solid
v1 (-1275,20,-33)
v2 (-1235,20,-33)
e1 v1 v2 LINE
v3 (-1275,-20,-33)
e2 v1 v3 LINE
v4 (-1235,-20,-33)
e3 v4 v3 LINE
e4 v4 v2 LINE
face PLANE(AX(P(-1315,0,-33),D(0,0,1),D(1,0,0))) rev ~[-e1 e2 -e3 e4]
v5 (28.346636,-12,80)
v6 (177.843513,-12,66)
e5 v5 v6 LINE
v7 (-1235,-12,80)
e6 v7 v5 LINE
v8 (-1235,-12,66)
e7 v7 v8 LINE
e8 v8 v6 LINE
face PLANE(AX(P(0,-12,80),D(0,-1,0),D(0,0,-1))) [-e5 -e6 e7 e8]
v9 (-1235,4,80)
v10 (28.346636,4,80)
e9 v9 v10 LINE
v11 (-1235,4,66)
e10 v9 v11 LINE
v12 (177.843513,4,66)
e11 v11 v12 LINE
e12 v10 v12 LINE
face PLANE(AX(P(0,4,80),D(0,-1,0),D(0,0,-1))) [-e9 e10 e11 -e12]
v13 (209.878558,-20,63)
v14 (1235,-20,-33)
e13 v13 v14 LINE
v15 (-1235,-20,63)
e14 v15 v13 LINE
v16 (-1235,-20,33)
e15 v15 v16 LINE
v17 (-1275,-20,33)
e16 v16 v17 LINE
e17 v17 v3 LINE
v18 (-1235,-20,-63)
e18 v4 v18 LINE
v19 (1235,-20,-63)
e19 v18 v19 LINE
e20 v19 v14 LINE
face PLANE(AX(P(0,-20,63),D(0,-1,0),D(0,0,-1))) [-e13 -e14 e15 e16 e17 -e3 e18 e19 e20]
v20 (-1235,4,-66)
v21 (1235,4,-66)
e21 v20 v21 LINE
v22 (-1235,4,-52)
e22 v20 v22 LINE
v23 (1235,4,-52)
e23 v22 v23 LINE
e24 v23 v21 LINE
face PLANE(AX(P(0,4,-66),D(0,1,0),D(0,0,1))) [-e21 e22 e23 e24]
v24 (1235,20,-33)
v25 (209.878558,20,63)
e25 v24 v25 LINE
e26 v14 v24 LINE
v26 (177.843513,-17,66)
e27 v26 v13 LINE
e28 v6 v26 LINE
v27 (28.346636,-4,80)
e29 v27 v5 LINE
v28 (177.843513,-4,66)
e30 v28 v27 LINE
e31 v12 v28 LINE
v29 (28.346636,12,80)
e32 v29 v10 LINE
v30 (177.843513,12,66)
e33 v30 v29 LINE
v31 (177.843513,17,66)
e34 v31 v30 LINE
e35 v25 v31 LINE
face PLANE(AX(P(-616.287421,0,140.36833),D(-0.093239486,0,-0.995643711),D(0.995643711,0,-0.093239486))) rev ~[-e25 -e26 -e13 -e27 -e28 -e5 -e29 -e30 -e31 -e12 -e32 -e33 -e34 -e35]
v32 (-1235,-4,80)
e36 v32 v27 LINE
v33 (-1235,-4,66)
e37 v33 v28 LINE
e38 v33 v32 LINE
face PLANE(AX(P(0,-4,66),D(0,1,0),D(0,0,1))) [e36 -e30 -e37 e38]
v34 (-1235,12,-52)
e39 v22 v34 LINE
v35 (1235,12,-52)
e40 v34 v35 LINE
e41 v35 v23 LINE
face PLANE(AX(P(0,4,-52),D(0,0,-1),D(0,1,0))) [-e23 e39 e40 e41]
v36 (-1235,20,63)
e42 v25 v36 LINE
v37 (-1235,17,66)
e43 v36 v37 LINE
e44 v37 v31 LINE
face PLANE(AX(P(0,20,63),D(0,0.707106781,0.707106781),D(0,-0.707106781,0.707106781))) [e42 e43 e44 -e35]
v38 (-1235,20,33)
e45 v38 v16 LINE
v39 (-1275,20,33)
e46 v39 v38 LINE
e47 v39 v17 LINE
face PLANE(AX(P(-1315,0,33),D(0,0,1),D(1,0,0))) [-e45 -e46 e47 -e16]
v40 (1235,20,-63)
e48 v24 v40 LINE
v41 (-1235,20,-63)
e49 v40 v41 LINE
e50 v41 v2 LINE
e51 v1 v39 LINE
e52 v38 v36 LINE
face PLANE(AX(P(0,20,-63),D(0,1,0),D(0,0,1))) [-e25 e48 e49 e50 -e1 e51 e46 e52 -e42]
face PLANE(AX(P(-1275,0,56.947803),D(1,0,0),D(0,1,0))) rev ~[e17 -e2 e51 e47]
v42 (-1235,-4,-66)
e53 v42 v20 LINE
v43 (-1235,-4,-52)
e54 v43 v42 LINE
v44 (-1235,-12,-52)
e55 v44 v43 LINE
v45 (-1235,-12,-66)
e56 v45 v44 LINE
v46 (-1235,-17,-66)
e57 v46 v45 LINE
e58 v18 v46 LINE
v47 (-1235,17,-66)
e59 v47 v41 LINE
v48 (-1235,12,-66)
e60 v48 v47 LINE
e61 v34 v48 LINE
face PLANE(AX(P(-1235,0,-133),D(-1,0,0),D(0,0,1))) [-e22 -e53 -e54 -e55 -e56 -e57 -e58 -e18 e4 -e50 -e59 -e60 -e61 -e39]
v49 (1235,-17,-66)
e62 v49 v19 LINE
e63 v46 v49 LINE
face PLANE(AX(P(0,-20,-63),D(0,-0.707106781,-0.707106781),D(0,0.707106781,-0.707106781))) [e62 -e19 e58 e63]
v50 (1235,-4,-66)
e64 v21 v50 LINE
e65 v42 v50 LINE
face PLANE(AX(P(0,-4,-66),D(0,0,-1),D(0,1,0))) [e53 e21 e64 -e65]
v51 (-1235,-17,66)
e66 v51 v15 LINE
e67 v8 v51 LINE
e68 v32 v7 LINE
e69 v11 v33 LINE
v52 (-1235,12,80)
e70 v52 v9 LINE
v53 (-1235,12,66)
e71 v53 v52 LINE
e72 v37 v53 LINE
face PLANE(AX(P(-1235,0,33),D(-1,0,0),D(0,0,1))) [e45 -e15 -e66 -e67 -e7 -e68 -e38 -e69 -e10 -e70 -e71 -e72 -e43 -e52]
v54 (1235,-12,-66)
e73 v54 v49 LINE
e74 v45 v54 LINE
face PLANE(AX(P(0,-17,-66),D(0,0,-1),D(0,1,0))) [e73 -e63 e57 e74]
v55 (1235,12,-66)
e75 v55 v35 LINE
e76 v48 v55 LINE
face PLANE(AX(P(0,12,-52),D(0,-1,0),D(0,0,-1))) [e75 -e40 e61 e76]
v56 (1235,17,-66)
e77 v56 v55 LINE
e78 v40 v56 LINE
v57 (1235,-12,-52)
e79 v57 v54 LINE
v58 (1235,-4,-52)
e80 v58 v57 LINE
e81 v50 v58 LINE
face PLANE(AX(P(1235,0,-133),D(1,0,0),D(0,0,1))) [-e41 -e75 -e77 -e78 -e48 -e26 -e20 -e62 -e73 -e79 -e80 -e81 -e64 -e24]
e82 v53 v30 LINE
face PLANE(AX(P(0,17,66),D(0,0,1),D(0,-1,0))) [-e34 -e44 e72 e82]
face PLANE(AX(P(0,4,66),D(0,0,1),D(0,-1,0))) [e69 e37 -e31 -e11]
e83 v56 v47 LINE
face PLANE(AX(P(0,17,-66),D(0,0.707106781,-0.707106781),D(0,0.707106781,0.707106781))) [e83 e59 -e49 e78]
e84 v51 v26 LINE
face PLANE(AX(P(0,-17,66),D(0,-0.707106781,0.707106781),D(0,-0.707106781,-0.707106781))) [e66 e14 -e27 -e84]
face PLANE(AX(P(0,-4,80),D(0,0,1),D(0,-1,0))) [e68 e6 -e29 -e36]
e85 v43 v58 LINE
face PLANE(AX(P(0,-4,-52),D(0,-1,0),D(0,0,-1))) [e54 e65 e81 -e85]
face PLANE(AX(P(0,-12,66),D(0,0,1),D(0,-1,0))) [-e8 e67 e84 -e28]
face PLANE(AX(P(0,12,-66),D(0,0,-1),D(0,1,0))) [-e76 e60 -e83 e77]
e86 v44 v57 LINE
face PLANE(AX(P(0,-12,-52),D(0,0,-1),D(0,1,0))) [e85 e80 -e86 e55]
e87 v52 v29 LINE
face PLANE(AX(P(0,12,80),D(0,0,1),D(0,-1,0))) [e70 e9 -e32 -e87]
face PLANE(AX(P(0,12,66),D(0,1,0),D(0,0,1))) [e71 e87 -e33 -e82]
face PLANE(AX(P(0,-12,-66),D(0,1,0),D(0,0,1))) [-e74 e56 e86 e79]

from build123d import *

# Parameters (mm, degrees)
F1_W     = 40
F1_H     = 33
F3_DEPTH = 1275
F2_W     = 80
F2_H     = 100
F4_DEPTH = 25
F6_DEPTH = 25


with BuildPart() as f3:
    # F1 (on Right) → F3 (new body, symmetric)
    with BuildSketch(Plane.YZ):
        Polygon((20, 33), (20, 63), (17, 66), (12, 66), (12, 80), (4, 80), (4, 66), (-4, 66), (-4, 80), (-12, 80), (-12, 66), (-17, 66), (-20, 63), (-20, 33), align=None)
        with Locations((0, 16.5)):
            Rectangle(F1_W, F1_H)
        with Locations((0, -16.5)):
            Rectangle(F1_W, F1_H)
        Polygon((20, -63), (20, -33), (-20, -33), (-20, -63), (-17, -66), (-12, -66), (-12, -52), (-4, -52), (-4, -66), (4, -66), (4, -52), (12, -52), (12, -66), (17, -66), align=None)
    extrude(amount=F3_DEPTH, both=True)

    # F2 (on Front) → F4 (cut, symmetric)
    with BuildSketch(Plane.XZ):
        with Locations((-1275, 83)):
            Rectangle(F2_W, F2_H)
        with Locations((-1275, -83)):
            Rectangle(F2_W, F2_H)
        with Locations((1275, 83)):
            Rectangle(F2_W, F2_H)
        with Locations((1275, -83)):
            Rectangle(F2_W, F2_H)
    extrude(amount=F4_DEPTH, both=True, mode=Mode.SUBTRACT)

    # F5 (on Front) → F6 (cut, symmetric)
    with BuildSketch(Plane.XZ):
        Polygon((1375, 140.368329996), (-616.2874210137, 140.368329996), (1375, -46.110641775), align=None)
    extrude(amount=F6_DEPTH, both=True, mode=Mode.SUBTRACT)


solid = f3.part
